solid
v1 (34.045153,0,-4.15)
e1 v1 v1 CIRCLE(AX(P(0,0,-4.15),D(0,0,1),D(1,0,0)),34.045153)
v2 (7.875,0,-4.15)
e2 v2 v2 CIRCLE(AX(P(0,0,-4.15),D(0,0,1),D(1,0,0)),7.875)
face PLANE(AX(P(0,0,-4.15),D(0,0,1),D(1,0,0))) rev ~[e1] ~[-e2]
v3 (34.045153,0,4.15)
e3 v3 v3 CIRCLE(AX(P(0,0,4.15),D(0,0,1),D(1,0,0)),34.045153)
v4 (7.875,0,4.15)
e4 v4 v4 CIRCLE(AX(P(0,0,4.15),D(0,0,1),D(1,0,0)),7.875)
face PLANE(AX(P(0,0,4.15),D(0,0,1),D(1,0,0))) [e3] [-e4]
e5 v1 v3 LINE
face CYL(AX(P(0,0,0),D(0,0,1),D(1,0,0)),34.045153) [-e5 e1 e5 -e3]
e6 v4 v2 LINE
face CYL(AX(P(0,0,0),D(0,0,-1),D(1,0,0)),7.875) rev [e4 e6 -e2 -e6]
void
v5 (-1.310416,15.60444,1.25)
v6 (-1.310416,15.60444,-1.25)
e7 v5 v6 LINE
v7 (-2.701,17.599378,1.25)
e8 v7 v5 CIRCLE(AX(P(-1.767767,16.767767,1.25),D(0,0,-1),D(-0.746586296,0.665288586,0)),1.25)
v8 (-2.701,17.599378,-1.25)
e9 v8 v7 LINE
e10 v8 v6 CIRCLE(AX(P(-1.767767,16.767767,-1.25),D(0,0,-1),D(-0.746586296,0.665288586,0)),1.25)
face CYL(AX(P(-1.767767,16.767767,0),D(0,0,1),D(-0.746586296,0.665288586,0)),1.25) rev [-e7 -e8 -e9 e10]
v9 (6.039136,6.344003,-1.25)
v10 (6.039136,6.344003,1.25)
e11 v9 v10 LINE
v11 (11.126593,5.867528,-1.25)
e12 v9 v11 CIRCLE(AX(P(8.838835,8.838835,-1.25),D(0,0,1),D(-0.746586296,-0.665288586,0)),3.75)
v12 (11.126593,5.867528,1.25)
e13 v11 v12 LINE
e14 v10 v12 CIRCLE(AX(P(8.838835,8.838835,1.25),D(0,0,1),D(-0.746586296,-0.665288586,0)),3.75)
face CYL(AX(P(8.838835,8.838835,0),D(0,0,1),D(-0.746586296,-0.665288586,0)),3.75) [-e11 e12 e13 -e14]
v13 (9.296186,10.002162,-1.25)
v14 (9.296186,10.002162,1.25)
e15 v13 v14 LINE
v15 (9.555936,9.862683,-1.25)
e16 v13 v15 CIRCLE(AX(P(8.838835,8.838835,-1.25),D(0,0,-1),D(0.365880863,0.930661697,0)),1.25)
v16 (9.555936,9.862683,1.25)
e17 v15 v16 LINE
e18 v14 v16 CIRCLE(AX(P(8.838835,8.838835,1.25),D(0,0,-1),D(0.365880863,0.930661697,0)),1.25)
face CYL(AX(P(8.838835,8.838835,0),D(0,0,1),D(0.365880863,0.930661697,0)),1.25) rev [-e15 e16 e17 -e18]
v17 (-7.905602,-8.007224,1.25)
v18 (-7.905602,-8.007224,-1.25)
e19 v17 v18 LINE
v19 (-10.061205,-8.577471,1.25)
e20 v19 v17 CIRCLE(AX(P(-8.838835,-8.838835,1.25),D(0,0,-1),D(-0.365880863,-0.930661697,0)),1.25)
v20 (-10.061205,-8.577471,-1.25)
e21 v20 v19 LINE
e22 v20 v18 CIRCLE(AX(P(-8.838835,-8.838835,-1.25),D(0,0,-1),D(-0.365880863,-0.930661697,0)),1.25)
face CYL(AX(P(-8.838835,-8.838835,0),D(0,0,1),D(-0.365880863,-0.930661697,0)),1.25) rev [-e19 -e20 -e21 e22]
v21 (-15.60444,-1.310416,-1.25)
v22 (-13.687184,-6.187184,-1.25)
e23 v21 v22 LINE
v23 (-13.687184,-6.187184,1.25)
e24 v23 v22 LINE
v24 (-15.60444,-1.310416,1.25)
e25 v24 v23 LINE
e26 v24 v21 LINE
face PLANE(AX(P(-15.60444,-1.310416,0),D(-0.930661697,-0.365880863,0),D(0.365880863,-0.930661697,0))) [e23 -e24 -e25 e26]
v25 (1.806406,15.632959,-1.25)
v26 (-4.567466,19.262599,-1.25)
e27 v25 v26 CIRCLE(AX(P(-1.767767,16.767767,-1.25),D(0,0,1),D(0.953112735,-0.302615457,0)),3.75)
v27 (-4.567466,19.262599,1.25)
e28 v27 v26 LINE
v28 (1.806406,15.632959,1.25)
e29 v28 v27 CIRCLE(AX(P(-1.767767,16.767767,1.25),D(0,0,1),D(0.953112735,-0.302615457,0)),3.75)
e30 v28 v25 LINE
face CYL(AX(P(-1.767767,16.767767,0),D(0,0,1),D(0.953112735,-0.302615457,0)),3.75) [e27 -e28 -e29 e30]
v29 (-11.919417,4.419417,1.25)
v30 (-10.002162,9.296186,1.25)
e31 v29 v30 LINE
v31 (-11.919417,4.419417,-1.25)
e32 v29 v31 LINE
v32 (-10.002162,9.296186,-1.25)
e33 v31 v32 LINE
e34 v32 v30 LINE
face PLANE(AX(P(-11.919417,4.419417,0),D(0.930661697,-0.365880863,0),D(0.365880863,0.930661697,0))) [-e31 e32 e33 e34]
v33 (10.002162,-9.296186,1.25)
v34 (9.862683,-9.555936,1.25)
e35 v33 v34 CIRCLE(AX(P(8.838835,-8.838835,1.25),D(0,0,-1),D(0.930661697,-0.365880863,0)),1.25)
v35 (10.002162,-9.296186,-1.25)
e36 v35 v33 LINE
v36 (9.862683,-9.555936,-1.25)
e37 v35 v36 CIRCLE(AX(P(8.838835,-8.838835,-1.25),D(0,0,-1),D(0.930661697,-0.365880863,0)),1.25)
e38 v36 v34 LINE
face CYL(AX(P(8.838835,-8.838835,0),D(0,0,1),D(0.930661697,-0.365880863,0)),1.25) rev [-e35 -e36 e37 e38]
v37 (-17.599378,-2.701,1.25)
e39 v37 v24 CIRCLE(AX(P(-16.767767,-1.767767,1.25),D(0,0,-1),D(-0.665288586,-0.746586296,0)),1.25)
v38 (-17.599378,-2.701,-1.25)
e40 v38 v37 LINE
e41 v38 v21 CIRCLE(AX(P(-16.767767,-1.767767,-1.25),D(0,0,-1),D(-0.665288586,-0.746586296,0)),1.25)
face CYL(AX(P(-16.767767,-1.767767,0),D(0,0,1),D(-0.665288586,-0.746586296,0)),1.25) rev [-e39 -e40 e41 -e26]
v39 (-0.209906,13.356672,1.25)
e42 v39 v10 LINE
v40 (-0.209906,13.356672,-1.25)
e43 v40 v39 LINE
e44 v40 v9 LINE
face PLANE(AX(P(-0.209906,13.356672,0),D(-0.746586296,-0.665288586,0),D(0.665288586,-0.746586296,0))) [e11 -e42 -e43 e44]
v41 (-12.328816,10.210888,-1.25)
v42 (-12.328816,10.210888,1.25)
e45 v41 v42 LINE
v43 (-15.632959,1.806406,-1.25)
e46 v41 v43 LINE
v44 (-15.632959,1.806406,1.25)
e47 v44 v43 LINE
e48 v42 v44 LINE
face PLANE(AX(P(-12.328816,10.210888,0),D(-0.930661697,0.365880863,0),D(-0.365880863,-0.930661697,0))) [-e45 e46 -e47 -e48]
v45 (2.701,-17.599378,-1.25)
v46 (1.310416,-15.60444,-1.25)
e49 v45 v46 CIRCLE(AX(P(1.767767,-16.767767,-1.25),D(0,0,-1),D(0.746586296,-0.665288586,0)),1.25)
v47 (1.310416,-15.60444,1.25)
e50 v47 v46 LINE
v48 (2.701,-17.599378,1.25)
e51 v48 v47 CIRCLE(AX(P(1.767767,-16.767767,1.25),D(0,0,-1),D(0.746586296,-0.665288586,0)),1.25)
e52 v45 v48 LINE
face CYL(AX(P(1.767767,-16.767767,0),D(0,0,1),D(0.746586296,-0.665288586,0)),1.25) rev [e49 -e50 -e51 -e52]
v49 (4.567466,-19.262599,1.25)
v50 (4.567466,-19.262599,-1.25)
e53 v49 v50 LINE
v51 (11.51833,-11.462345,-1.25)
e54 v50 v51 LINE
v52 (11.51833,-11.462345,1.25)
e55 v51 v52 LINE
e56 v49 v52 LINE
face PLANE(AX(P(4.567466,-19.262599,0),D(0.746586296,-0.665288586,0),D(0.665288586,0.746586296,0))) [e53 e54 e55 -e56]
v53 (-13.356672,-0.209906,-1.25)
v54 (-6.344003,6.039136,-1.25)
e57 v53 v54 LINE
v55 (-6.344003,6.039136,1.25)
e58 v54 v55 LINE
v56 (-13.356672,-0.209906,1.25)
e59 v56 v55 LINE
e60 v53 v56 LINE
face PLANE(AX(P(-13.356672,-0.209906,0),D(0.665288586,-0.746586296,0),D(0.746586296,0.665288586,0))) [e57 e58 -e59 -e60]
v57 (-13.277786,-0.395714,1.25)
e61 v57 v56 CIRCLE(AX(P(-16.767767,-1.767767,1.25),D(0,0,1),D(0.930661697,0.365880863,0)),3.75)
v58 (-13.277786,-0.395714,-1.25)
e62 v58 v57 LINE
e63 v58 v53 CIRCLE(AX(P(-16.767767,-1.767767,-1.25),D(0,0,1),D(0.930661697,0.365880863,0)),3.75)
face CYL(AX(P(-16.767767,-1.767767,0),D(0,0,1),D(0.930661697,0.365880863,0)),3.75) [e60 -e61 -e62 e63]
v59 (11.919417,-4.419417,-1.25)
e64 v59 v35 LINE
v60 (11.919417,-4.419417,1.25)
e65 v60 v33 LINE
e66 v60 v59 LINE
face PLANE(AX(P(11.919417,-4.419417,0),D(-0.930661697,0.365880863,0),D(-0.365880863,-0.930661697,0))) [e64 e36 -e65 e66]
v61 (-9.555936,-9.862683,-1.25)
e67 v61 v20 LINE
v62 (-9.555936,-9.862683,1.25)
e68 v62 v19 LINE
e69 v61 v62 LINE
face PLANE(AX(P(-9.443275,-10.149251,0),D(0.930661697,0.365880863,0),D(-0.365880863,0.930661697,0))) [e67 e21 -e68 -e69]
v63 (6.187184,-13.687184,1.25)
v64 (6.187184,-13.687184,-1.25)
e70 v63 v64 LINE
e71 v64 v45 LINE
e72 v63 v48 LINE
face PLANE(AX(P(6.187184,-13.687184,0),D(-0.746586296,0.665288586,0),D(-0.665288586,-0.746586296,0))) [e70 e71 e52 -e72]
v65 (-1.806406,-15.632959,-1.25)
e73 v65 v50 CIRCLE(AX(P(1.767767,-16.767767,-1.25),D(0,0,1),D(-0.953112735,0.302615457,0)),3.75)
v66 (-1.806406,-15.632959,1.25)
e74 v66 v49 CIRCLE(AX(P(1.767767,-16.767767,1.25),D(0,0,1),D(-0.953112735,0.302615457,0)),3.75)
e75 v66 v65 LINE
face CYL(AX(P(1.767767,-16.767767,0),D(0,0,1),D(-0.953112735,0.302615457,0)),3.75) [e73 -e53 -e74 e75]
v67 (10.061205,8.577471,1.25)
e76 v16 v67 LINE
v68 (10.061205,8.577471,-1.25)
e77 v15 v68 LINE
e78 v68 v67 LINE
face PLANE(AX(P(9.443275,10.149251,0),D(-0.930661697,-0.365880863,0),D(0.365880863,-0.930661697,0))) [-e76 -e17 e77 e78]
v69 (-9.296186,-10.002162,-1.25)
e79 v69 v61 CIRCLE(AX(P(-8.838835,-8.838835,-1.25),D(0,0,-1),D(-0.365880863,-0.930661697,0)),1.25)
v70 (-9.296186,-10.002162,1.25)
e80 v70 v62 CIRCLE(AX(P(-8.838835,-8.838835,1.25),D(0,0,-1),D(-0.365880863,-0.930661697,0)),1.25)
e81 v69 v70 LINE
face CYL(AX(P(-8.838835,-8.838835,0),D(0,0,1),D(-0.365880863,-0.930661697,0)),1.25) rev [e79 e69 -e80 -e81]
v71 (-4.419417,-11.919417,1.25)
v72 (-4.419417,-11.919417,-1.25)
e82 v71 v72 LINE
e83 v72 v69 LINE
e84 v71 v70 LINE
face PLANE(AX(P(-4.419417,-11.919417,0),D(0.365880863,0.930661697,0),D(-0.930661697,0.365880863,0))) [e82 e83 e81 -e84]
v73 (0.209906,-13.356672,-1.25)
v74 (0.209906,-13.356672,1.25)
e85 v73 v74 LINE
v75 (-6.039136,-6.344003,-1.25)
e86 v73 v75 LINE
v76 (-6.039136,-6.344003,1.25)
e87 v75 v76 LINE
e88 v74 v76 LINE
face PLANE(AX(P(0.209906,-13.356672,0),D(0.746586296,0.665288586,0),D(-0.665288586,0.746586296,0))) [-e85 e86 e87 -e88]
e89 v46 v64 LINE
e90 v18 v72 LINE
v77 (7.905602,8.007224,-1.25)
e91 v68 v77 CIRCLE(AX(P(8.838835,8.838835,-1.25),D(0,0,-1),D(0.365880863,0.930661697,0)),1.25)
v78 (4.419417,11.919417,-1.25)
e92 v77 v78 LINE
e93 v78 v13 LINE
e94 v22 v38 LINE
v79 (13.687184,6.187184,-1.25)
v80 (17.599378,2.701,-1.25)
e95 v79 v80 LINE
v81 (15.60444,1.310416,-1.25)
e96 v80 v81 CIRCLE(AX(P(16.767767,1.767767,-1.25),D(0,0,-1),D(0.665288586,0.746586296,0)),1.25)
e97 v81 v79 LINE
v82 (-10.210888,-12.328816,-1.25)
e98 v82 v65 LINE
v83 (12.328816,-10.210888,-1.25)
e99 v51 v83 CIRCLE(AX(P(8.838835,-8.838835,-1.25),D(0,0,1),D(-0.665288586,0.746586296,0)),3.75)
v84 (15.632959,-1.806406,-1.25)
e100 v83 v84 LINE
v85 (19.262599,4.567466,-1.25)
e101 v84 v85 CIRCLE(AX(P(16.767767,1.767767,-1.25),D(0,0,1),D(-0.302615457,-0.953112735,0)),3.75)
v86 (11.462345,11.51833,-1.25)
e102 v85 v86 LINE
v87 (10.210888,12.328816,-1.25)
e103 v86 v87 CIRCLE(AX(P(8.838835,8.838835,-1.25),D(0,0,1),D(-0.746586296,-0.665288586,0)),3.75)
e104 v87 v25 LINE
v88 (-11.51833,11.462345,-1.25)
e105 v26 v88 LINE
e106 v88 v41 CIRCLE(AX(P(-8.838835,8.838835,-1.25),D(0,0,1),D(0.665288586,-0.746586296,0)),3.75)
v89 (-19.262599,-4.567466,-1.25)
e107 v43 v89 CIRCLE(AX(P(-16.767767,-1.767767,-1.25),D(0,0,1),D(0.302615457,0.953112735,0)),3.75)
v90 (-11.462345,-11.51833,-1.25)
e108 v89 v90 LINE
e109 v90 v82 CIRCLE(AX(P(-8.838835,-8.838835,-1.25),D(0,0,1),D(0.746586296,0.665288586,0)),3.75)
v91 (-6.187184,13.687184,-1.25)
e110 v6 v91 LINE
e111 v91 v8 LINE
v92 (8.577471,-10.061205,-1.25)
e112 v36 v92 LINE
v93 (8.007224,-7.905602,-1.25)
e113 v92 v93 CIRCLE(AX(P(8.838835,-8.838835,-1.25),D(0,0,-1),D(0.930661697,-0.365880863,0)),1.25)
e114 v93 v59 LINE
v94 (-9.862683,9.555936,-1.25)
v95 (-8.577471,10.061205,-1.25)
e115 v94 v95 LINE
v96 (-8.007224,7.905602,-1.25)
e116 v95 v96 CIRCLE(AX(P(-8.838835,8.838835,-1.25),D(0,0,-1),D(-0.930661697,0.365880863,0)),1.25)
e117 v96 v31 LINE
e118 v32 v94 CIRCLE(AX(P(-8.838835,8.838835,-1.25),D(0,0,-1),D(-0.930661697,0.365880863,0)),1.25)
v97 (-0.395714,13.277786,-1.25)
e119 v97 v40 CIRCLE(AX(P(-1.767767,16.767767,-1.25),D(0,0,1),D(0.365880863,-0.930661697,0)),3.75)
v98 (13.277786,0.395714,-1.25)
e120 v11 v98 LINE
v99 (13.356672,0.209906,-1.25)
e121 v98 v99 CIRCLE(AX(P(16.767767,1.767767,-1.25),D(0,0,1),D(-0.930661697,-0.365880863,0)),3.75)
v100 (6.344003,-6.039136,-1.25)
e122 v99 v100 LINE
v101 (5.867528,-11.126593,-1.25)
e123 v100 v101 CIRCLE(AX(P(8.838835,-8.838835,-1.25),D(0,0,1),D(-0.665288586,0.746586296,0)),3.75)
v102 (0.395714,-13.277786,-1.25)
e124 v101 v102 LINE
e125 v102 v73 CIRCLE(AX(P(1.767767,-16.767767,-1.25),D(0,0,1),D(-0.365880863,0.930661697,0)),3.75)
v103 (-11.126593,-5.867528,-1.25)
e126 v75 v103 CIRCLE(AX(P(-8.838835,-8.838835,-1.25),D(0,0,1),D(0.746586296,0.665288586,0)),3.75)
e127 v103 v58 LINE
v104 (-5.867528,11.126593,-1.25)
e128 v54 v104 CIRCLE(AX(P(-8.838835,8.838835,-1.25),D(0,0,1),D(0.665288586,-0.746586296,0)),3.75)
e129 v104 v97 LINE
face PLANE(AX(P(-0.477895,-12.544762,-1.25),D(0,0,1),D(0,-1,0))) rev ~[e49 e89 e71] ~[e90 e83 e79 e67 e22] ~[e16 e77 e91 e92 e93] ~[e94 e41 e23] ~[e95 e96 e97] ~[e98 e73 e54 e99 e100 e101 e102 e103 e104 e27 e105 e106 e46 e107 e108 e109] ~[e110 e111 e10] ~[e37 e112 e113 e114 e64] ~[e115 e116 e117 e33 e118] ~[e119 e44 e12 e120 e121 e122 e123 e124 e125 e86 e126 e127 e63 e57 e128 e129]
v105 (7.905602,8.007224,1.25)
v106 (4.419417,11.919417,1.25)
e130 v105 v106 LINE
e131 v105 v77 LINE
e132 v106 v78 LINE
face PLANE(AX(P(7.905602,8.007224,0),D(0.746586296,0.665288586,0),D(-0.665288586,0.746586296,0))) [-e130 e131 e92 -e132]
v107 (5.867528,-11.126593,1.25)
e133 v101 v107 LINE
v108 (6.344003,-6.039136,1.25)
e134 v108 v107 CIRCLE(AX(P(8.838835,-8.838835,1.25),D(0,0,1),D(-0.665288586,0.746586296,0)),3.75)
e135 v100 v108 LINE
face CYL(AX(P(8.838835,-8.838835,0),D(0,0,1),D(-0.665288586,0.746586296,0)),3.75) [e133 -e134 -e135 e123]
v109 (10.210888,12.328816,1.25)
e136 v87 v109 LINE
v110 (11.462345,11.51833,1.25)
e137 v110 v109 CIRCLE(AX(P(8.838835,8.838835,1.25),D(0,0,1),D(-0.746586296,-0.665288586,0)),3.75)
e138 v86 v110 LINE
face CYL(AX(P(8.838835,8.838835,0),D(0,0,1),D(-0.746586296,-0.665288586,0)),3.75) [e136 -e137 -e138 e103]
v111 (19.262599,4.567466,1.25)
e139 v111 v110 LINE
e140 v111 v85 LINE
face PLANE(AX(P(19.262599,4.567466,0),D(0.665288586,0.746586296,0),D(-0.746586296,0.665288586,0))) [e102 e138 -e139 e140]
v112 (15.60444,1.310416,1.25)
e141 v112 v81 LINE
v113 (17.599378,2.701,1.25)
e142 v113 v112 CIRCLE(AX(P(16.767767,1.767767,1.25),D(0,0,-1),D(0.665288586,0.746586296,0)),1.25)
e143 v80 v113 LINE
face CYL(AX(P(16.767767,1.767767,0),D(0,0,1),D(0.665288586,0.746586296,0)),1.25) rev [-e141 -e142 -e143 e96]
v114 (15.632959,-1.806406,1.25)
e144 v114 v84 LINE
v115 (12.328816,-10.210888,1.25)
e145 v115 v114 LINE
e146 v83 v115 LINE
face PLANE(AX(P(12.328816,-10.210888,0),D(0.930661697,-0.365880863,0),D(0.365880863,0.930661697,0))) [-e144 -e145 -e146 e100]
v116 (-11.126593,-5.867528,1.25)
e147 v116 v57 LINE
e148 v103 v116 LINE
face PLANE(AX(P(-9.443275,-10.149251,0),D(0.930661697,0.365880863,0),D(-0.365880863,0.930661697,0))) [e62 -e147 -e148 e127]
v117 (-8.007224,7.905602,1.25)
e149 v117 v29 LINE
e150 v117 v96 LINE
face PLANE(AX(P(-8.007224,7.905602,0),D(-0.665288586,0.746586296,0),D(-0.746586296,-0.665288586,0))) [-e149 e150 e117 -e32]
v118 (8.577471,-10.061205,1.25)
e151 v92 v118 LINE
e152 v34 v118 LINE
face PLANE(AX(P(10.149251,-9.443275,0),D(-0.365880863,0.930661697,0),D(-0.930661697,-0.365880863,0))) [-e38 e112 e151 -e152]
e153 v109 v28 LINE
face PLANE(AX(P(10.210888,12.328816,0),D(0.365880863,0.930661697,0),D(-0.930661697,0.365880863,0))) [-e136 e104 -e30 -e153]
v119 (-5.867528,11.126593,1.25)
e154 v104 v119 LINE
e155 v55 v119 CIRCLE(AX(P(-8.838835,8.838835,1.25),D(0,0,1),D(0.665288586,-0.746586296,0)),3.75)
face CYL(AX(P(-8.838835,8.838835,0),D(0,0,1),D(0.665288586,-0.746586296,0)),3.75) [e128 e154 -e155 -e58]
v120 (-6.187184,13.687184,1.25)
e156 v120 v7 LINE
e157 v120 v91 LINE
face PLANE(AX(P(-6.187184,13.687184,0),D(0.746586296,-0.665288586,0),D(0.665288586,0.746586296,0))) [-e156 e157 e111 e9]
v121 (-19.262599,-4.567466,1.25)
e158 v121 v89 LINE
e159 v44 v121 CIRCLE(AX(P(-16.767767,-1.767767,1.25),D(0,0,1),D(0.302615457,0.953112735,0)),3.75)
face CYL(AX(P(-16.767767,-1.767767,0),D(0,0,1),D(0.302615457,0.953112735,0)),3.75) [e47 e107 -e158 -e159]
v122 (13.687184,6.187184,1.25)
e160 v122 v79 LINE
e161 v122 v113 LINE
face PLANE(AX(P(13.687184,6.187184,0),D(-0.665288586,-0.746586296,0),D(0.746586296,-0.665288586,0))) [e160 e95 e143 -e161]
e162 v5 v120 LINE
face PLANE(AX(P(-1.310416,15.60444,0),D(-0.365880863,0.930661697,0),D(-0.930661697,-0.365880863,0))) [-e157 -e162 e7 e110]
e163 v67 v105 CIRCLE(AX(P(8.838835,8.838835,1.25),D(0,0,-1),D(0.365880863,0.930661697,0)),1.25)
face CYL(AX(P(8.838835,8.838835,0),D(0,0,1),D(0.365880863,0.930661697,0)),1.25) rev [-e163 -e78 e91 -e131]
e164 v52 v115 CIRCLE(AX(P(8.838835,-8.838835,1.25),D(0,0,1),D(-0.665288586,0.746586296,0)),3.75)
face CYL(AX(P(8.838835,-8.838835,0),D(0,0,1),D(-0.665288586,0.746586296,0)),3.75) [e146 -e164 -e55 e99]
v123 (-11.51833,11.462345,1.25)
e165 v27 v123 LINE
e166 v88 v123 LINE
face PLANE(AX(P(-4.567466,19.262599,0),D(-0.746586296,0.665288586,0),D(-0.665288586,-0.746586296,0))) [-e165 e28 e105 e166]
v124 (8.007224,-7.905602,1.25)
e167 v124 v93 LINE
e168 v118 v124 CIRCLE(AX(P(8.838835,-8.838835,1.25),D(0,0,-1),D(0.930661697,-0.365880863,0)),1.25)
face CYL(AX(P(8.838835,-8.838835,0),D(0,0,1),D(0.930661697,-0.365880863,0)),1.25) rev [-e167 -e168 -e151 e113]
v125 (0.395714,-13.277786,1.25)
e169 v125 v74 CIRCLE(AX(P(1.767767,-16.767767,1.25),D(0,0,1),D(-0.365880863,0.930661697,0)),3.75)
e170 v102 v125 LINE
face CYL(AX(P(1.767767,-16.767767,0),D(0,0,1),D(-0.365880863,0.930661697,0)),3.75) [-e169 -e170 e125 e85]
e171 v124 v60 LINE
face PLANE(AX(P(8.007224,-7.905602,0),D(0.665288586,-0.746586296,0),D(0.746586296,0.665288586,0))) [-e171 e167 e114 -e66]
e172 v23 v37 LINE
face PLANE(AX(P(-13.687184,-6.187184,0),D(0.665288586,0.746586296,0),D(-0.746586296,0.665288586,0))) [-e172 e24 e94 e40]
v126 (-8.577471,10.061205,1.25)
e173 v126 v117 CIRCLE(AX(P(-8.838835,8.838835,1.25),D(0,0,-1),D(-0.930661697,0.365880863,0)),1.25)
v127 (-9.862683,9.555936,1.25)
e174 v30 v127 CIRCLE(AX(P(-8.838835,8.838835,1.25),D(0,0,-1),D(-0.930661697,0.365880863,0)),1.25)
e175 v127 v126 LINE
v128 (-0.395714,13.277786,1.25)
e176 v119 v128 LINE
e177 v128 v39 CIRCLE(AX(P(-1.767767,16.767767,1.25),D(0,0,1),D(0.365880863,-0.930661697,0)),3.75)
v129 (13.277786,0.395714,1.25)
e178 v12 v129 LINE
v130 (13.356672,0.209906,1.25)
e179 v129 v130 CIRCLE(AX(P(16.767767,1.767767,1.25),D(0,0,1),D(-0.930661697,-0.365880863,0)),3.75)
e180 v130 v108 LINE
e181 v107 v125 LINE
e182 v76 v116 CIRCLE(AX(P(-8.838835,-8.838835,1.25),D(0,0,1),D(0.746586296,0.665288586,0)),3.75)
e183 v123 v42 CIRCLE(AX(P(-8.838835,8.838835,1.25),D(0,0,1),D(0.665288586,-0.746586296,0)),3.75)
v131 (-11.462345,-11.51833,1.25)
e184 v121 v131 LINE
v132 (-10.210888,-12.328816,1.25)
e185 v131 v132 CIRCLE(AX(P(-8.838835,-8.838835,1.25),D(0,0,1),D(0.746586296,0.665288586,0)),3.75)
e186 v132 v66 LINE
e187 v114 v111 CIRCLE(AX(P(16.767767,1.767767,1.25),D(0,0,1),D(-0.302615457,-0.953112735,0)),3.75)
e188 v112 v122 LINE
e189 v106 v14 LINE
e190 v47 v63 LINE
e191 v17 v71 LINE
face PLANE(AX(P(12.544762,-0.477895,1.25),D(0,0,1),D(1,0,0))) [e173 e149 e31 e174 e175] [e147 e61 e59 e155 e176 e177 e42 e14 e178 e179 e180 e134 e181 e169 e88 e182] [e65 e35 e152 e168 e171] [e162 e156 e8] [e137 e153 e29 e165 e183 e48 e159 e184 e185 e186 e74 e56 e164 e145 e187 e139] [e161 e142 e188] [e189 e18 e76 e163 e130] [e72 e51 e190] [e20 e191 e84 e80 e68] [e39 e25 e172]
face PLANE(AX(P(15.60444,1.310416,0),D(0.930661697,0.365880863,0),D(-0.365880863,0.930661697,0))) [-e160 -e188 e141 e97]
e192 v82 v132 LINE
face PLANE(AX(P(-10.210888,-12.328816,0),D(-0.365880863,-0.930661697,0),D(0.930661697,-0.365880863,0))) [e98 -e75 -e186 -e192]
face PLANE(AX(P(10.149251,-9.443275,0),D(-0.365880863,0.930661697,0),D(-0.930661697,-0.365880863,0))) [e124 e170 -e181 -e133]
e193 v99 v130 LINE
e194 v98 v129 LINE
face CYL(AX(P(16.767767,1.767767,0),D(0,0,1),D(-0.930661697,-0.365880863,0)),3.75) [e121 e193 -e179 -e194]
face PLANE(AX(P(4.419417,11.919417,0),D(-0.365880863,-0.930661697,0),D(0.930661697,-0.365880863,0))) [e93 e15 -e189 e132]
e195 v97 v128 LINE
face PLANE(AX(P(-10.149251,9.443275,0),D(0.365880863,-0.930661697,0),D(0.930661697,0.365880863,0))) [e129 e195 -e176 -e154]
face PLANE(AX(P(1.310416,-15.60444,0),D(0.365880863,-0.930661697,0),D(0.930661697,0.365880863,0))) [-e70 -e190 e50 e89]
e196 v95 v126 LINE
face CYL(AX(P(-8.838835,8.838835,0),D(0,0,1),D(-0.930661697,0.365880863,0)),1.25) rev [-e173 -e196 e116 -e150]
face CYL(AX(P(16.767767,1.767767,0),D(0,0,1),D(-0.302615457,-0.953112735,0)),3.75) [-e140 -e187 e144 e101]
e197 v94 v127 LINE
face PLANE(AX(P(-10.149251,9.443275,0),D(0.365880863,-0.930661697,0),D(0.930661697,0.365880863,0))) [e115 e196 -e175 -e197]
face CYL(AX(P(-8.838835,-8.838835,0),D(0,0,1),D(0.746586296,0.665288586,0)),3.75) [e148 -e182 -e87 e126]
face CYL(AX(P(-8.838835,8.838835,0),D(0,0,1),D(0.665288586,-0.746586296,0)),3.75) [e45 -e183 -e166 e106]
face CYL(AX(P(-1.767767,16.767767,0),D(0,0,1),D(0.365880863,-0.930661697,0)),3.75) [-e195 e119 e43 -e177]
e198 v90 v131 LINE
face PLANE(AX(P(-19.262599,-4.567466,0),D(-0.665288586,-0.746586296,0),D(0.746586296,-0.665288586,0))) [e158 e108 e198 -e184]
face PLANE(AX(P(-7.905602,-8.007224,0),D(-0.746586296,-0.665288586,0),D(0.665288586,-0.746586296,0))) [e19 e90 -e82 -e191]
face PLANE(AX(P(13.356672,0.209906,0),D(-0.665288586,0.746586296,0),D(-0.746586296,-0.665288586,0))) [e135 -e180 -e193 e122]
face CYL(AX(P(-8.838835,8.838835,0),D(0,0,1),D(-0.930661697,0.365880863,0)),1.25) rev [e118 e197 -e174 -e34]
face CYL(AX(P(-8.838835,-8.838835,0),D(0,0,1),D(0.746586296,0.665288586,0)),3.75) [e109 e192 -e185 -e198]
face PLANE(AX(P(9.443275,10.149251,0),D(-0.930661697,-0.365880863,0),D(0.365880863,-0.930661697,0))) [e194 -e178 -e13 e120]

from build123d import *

# Parameters (mm, degrees)
F0_R            = 34.0451530949
F0_R_2          = 1.25
F0_R_3          = 7.875
F1_DEPTH        = 4.15
F3_DEPTH        = 1.25
F3_COPIES_COUNT = 4


# Not quite as in the source:
# - a pattern or mirror of a feature is missing from the dataset's text; its kind, count and spacing are read off the source's solid


with BuildPart() as f1:
    # F0 (on Top) → F1 (new body, symmetric)
    with BuildSketch(Plane.XY):
        Circle(F0_R)
        with Locations((10.6066017178, -10.6066017178)):
            Circle(F0_R_2, mode=Mode.SUBTRACT)
        Circle(F0_R_3, mode=Mode.SUBTRACT)
        with Locations((15, 0)):
            Circle(F0_R_2, mode=Mode.SUBTRACT)
        with Locations((10.6066017178, 10.6066017178)):
            Circle(F0_R_2, mode=Mode.SUBTRACT)
        with Locations((10.6066017178, 10.6066017178)):
            Circle(F0_R_2)
        with Locations((15, 0)):
            Circle(F0_R_2)
        with Locations((10.6066017178, -10.6066017178)):
            Circle(F0_R_2)
    extrude(amount=F1_DEPTH, both=True)

    # F2 (on Top) → F3 (cut, symmetric)
    with BuildSketch(Plane.XY):
        with BuildLine():
            Line((9.4432745967, 10.1492506389), (13.2777855897, 0.3957137164))
            ThreePointArc((13.2777855897, 0.3957137164), (13.3159783656, 0.3022787926), (13.3566720831, 0.2099056662))
            Line((13.3566720831, 0.2099056662), (6.3440025672, -6.039136155))
            ThreePointArc((6.3440025672, -6.039136155), (6.6944330225, -11.915202943), (12.3288161281, -10.2108880014))
            Line((12.3288161281, -10.2108880014), (15.6329589882, -1.8064058021))
            ThreePointArc((15.6329589882, -1.8064058021), (20.0264439119, -0.0879066383), (19.2625991506, 4.5674655628))
            Line((19.2625991506, 4.5674655628), (11.4382124503, 11.5398345877))
            ThreePointArc((11.4382124503, 11.5398345877), (9.891801137, 11.6320577772), (9.4432745967, 10.1492506389))
        make_face()
        with BuildLine():
            ThreePointArc((10.0021618859, -9.2961858437), (8.1240341841, -9.8642908242), (8.0072240323, -7.9056018949))
            Line((8.0072240323, -7.9056018949), (11.9194173824, -4.4194173824))
            Line((11.9194173824, -4.4194173824), (10.0021618859, -9.2961858437))
        make_face(mode=Mode.SUBTRACT)
        with BuildLine():
            ThreePointArc((17.5993776855, 2.7009998229), (17.4825675337, 0.7423108936), (15.6044398319, 1.3104158741))
            Line((15.6044398319, 1.3104158741), (13.6871843354, 6.1871843354))
            Line((13.6871843354, 6.1871843354), (17.5993776855, 2.7009998229))
        make_face(mode=Mode.SUBTRACT)
    f3 = extrude(amount=F3_DEPTH, both=True, mode=Mode.SUBTRACT)

    # F3_copies: F3 ×4 about axis
    f3_copies_axis = Axis((0, 0, 0), (0, 0, 1))
    for i in range(1, F3_COPIES_COUNT):
        add(f3.rotate(f3_copies_axis, i * 360 / F3_COPIES_COUNT), mode=Mode.SUBTRACT)


solid = f1.part
